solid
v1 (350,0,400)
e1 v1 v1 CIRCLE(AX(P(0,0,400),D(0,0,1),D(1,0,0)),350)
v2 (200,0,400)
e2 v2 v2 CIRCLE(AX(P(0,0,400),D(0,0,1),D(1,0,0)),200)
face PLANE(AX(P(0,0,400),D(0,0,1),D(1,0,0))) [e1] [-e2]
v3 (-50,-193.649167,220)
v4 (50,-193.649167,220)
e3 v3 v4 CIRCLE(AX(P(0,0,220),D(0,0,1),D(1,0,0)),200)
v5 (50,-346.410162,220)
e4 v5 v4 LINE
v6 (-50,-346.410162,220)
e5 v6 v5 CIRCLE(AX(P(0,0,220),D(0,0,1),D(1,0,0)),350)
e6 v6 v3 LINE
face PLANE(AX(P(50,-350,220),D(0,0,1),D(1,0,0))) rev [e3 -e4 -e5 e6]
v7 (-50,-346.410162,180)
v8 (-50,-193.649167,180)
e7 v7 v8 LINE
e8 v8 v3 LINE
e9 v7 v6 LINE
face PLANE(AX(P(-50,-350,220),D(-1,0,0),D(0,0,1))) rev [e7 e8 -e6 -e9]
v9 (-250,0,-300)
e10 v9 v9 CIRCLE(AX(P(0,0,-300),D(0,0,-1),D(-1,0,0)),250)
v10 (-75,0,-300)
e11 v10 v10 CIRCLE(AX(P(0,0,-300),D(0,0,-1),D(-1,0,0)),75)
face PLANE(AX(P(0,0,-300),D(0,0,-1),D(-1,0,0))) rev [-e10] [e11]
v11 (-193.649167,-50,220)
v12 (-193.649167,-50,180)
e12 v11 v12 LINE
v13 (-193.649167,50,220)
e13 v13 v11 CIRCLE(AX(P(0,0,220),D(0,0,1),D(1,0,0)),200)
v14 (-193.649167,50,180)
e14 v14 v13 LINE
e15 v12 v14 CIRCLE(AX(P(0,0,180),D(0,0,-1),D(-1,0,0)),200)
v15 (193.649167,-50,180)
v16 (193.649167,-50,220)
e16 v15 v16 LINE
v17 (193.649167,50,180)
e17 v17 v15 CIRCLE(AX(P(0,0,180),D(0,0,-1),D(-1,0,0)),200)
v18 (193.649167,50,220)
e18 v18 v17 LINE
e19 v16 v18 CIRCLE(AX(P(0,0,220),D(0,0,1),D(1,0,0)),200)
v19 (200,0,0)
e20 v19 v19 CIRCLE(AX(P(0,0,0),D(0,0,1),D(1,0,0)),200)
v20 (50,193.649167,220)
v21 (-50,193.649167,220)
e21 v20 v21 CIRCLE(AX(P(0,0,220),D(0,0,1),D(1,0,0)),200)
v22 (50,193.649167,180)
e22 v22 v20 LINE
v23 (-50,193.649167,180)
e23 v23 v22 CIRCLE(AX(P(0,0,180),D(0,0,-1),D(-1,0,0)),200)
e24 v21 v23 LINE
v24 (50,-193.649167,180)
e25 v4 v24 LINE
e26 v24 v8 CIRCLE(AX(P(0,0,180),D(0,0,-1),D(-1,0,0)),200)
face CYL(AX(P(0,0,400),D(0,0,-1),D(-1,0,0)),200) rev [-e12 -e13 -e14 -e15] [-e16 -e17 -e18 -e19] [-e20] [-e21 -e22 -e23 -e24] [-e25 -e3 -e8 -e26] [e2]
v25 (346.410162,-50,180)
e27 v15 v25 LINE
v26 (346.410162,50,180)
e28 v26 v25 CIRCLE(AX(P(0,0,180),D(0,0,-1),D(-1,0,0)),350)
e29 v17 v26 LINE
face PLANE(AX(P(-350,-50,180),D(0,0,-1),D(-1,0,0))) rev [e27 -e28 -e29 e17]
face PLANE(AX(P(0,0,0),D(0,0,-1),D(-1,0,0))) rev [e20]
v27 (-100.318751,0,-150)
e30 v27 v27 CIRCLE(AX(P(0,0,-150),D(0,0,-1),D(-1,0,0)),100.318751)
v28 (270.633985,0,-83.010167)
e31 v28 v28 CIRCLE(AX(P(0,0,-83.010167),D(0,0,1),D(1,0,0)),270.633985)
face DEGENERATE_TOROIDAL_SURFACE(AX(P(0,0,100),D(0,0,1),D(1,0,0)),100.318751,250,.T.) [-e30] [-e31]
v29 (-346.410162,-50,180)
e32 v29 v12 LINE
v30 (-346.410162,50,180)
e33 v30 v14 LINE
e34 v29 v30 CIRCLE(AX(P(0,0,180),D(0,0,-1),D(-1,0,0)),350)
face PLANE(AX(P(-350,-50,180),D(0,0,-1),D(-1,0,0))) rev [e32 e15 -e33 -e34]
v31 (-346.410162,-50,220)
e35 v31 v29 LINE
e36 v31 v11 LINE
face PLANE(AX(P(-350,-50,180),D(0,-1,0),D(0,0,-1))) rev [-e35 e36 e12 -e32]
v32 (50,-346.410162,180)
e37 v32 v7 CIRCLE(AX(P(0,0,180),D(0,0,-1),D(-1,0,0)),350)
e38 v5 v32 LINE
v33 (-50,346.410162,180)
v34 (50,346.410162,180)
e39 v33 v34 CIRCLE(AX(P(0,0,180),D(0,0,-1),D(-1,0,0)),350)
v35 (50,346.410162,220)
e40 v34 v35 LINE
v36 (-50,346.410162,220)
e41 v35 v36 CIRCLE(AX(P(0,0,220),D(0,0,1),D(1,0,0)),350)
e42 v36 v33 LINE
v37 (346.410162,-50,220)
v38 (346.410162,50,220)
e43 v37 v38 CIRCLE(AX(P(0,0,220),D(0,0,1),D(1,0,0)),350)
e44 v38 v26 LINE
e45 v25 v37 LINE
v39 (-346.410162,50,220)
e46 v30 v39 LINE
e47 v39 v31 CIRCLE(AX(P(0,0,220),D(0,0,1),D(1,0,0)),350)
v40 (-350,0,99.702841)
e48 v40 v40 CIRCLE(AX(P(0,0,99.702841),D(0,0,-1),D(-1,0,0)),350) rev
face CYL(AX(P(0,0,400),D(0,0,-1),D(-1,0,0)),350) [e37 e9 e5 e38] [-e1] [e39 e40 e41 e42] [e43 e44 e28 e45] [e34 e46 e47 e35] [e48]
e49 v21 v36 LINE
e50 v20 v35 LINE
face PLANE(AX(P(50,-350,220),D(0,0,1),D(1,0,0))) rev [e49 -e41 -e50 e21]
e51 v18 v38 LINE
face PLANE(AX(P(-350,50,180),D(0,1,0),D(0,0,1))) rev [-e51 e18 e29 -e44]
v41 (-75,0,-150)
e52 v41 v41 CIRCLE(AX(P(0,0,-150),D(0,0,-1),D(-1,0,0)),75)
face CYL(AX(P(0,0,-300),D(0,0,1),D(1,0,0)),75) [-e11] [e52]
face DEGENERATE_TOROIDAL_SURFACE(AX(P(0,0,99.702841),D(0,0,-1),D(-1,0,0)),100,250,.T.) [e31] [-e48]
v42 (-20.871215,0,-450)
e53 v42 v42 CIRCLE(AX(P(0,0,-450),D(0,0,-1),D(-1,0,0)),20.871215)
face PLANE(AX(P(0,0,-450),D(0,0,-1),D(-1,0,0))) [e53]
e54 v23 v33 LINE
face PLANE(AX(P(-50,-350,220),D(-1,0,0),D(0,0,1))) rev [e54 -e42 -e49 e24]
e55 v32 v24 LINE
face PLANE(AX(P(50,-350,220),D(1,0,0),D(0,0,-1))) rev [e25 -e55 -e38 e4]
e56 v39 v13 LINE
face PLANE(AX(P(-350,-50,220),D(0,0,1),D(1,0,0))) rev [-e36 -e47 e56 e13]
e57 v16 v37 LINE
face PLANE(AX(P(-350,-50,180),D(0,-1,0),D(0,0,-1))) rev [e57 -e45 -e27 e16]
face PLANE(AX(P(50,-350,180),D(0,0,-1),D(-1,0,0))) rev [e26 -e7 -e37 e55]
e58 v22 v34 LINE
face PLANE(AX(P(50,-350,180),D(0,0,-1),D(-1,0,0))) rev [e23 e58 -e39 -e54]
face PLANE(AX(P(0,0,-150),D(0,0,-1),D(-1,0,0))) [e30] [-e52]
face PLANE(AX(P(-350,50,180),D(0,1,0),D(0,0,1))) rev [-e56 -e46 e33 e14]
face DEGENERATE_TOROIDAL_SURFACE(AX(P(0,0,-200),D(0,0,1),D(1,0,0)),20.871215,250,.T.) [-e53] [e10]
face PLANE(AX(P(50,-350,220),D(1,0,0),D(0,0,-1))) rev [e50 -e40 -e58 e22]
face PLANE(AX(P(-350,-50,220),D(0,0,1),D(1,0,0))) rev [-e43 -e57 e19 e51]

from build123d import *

# Parameters (mm, degrees)
SKETCH1_R               = 350
SKETCH1_R_2             = 200
BOSS_EXTRUDE2_DEPTH     = 400
CUT_EXTRUDE2_DEPTH      = 637.396103068
CUT_EXTRUDE2_DEPTH_BACK = 637.396103068
SKETCH2_W               = 100
SKETCH2_H               = 40
CUT_EXTRUDE3_DEPTH      = 637.396103068
CUT_EXTRUDE3_DEPTH_BACK = 637.396103068
SKETCH3_W               = 40
SKETCH3_H               = 100
BOSS_EXTRUDE3_START     = 10
SKETCH6_R               = 350
BOSS_EXTRUDE3_DEPTH     = 10
SKETCH7_R               = 75
BOSS_EXTRUDE4_DEPTH     = 150
SKETCH9_R               = 250
BOSS_EXTRUDE5_DEPTH     = 150
FILLET1_R               = 250
FILLET3_R               = 250
FILLET4_R               = 250


with BuildPart() as part:
    # Sketch1 → Boss-Extrude2 (new body)
    with BuildSketch(Plane.XY):
        Circle(SKETCH1_R)
        Circle(SKETCH1_R_2, mode=Mode.SUBTRACT)
    extrude(amount=BOSS_EXTRUDE2_DEPTH)

    # Sketch2 → Cut-Extrude2 (cut, two sides: drawn at the far end of the back side and taken through both)
    with BuildSketch(Plane(origin=(0, 0, 0), x_dir=(1, 0, 0), z_dir=(0, 1, 0)).offset(-CUT_EXTRUDE2_DEPTH_BACK)):
        with Locations((0, -200)):
            Rectangle(SKETCH2_W, SKETCH2_H)
    extrude(amount=CUT_EXTRUDE2_DEPTH + CUT_EXTRUDE2_DEPTH_BACK, mode=Mode.SUBTRACT)

    # Sketch3 → Cut-Extrude3 (cut, two sides: drawn at the far end of the back side and taken through both)
    with BuildSketch(Plane(origin=(0, 0, 0), x_dir=(0, 0, -1), z_dir=(1, 0, 0)).offset(-CUT_EXTRUDE3_DEPTH_BACK)):
        with Locations((-200, 0)):
            Rectangle(SKETCH3_W, SKETCH3_H)
    extrude(amount=CUT_EXTRUDE3_DEPTH + CUT_EXTRUDE3_DEPTH_BACK, mode=Mode.SUBTRACT)

    # Sketch6 → Boss-Extrude3 (add)
    with BuildSketch(Plane(origin=(0, 0, 0), x_dir=(-1, 0, 0), z_dir=(0, 0, -1)).offset(BOSS_EXTRUDE3_START)):
        Circle(SKETCH6_R)
    extrude(amount=-BOSS_EXTRUDE3_DEPTH)

    # Loft4: read off the stored shape, not the designer's step
    # Loft4: loft between two sections, ruled curve by curve
    loft4_from = [
        Edge.make_bspline([(170.39658005, -104.713922223, -150), (379.824424496, 236.079237876, -150), (39.031264397, 445.507082323, -150), (-170.39658005, 104.713922223, -150), (-379.824424496, -236.079237876, -150), (-39.031264397, -445.507082323, -150), (170.39658005, -104.713922223, -150)], [0, 0, 0, 0, 0.5, 0.5, 0.5, 1, 1, 1, 1], 3, [1, 0.333333333, 0.333333333, 1, 0.333333333, 0.333333333, 1]),
    ]
    loft4_to = [
        Edge.make_bspline([(327.249685966, -124.127527305, -10), (575.504740577, 530.371844627, -10), (-78.994631356, 778.626899238, -10), (-327.249685966, 124.127527305, -10), (-575.504740577, -530.371844627, -10), (78.994631356, -778.626899238, -10), (327.249685966, -124.127527305, -10)], [0, 0, 0, 0, 0.5, 0.5, 0.5, 1, 1, 1, 1], 3, [1, 0.333333333, 0.333333333, 1, 0.333333333, 0.333333333, 1]),
    ]
    loft4 = Solid(Shell([*[Face.make_surface_from_curves(loft4_from[k], loft4_to[k]) for k in range(1)], Face(Wire(loft4_from)), Face(Wire(loft4_to))]))
    add(loft4)

    # Sketch7 → Boss-Extrude4 (add)
    with BuildSketch(Plane(origin=(0, 0, -150), x_dir=(-1, 0, 0), z_dir=(0, 0, -1))):
        Circle(SKETCH7_R)
    extrude(amount=BOSS_EXTRUDE4_DEPTH)

    # Sketch9 → Boss-Extrude5 (add)
    with BuildSketch(Plane(origin=(0, 0, -300), x_dir=(-1, 0, 0), z_dir=(0, 0, -1))):
        Circle(SKETCH9_R)
    extrude(amount=BOSS_EXTRUDE5_DEPTH)

    # Fillet1
    # the kernel refuses this fillet: 250 mm, written as the material it takes off along each edge
    with BuildSketch(Plane(origin=(0, 0, -450), x_dir=(-1, 0, 0), z_dir=(0, -1, 0))) as fillet1_piece_1:
        with BuildLine():
            CenterArc((20.871215252, -250), FILLET1_R, 23.578178478, 66.421821522)
            Line((20.871215252, 0), (20.871215252, 5))
            Line((20.871215252, 5), (250, 5))
            Line((250, 5), (255, 0))
            ThreePointArc((255, 0), (255, -75), (254.582575695, -148))
            Line((254.582575695, -148), (250, -150))
        make_face()
    revolve(axis=Axis((0, 0, -450), (0, 0, -1)), mode=Mode.SUBTRACT)

    # Fillet3
    # the kernel refuses this fillet: 250 mm, written as the material it takes off along each edge
    with BuildSketch(Plane(origin=(0, 0, -150), x_dir=(0.8519829002496553, -0.5235696111141154, 0), z_dir=(-0.5235696111141154, -0.8519829002496553, 0))) as fillet3_piece_1:
        with BuildLine():
            CenterArc((100.318750936, 250), FILLET3_R, 270, 42.94225565)
            Line((270.633984519, 66.989833043), (274.04028919, 63.329629703))
            ThreePointArc((274.04028919, 63.329629703), (238.570984694, 30.057815333), (203.487874785, -3.582559069))
            Line((203.487874785, -3.582559069), (200, -5))
            Line((200, -5), (100.318750936, -5))
            Line((100.318750936, -5), (100.318750936, 0))
        make_face()
    revolve(axis=Axis((0, 0, -150), (0, 0, 1)), mode=Mode.SUBTRACT)

    # Fillet4
    # the kernel refuses this fillet: 250 mm, written as the material it takes off along each edge
    with BuildSketch(Plane(origin=(0, 0, -10), x_dir=(-1, 0, 0), z_dir=(0, -1, 0))) as fillet4_piece_1:
        with BuildLine():
            CenterArc((100, -109.702841138), FILLET4_R, 0, 46.957870566)
            Line((350, -109.702841138), (355, -109.702841138))
            Line((355, -109.702841138), (355, 0))
            Line((355, 0), (353.36883922, 3.694715457))
            ThreePointArc((353.36883922, 3.694715457), (313.60959417, 40.086717001), (274.046664209, 76.664427119))
            Line((274.046664209, 76.664427119), (270.633984518, 73.010166957))
        make_face()
    revolve(axis=Axis((0, 0, -10), (0, 0, -1)), revolution_arc=200.772, mode=Mode.SUBTRACT)
    with BuildSketch(Plane(origin=(0, 0, -10), x_dir=(0.9349991027611482, -0.35465007801472115, 0), z_dir=(0.35465007801472115, 0.9349991027611482, 0))) as fillet4_piece_2:
        with BuildLine():
            CenterArc((100, -109.702841138), FILLET4_R, 0, 46.957870566)
            Line((350, -109.702841138), (355, -109.702841138))
            Line((355, -109.702841138), (355, 0))
            Line((355, 0), (353.36883922, 3.694715457))
            ThreePointArc((353.36883922, 3.694715457), (313.60959417, 40.086717001), (274.046664209, 76.664427119))
            Line((274.046664209, 76.664427119), (270.633984519, 73.010166957))
        make_face()
    revolve(axis=Axis((0, 0, -10), (0, 0, -1)), revolution_arc=159.228, mode=Mode.SUBTRACT)


solid = part.part
